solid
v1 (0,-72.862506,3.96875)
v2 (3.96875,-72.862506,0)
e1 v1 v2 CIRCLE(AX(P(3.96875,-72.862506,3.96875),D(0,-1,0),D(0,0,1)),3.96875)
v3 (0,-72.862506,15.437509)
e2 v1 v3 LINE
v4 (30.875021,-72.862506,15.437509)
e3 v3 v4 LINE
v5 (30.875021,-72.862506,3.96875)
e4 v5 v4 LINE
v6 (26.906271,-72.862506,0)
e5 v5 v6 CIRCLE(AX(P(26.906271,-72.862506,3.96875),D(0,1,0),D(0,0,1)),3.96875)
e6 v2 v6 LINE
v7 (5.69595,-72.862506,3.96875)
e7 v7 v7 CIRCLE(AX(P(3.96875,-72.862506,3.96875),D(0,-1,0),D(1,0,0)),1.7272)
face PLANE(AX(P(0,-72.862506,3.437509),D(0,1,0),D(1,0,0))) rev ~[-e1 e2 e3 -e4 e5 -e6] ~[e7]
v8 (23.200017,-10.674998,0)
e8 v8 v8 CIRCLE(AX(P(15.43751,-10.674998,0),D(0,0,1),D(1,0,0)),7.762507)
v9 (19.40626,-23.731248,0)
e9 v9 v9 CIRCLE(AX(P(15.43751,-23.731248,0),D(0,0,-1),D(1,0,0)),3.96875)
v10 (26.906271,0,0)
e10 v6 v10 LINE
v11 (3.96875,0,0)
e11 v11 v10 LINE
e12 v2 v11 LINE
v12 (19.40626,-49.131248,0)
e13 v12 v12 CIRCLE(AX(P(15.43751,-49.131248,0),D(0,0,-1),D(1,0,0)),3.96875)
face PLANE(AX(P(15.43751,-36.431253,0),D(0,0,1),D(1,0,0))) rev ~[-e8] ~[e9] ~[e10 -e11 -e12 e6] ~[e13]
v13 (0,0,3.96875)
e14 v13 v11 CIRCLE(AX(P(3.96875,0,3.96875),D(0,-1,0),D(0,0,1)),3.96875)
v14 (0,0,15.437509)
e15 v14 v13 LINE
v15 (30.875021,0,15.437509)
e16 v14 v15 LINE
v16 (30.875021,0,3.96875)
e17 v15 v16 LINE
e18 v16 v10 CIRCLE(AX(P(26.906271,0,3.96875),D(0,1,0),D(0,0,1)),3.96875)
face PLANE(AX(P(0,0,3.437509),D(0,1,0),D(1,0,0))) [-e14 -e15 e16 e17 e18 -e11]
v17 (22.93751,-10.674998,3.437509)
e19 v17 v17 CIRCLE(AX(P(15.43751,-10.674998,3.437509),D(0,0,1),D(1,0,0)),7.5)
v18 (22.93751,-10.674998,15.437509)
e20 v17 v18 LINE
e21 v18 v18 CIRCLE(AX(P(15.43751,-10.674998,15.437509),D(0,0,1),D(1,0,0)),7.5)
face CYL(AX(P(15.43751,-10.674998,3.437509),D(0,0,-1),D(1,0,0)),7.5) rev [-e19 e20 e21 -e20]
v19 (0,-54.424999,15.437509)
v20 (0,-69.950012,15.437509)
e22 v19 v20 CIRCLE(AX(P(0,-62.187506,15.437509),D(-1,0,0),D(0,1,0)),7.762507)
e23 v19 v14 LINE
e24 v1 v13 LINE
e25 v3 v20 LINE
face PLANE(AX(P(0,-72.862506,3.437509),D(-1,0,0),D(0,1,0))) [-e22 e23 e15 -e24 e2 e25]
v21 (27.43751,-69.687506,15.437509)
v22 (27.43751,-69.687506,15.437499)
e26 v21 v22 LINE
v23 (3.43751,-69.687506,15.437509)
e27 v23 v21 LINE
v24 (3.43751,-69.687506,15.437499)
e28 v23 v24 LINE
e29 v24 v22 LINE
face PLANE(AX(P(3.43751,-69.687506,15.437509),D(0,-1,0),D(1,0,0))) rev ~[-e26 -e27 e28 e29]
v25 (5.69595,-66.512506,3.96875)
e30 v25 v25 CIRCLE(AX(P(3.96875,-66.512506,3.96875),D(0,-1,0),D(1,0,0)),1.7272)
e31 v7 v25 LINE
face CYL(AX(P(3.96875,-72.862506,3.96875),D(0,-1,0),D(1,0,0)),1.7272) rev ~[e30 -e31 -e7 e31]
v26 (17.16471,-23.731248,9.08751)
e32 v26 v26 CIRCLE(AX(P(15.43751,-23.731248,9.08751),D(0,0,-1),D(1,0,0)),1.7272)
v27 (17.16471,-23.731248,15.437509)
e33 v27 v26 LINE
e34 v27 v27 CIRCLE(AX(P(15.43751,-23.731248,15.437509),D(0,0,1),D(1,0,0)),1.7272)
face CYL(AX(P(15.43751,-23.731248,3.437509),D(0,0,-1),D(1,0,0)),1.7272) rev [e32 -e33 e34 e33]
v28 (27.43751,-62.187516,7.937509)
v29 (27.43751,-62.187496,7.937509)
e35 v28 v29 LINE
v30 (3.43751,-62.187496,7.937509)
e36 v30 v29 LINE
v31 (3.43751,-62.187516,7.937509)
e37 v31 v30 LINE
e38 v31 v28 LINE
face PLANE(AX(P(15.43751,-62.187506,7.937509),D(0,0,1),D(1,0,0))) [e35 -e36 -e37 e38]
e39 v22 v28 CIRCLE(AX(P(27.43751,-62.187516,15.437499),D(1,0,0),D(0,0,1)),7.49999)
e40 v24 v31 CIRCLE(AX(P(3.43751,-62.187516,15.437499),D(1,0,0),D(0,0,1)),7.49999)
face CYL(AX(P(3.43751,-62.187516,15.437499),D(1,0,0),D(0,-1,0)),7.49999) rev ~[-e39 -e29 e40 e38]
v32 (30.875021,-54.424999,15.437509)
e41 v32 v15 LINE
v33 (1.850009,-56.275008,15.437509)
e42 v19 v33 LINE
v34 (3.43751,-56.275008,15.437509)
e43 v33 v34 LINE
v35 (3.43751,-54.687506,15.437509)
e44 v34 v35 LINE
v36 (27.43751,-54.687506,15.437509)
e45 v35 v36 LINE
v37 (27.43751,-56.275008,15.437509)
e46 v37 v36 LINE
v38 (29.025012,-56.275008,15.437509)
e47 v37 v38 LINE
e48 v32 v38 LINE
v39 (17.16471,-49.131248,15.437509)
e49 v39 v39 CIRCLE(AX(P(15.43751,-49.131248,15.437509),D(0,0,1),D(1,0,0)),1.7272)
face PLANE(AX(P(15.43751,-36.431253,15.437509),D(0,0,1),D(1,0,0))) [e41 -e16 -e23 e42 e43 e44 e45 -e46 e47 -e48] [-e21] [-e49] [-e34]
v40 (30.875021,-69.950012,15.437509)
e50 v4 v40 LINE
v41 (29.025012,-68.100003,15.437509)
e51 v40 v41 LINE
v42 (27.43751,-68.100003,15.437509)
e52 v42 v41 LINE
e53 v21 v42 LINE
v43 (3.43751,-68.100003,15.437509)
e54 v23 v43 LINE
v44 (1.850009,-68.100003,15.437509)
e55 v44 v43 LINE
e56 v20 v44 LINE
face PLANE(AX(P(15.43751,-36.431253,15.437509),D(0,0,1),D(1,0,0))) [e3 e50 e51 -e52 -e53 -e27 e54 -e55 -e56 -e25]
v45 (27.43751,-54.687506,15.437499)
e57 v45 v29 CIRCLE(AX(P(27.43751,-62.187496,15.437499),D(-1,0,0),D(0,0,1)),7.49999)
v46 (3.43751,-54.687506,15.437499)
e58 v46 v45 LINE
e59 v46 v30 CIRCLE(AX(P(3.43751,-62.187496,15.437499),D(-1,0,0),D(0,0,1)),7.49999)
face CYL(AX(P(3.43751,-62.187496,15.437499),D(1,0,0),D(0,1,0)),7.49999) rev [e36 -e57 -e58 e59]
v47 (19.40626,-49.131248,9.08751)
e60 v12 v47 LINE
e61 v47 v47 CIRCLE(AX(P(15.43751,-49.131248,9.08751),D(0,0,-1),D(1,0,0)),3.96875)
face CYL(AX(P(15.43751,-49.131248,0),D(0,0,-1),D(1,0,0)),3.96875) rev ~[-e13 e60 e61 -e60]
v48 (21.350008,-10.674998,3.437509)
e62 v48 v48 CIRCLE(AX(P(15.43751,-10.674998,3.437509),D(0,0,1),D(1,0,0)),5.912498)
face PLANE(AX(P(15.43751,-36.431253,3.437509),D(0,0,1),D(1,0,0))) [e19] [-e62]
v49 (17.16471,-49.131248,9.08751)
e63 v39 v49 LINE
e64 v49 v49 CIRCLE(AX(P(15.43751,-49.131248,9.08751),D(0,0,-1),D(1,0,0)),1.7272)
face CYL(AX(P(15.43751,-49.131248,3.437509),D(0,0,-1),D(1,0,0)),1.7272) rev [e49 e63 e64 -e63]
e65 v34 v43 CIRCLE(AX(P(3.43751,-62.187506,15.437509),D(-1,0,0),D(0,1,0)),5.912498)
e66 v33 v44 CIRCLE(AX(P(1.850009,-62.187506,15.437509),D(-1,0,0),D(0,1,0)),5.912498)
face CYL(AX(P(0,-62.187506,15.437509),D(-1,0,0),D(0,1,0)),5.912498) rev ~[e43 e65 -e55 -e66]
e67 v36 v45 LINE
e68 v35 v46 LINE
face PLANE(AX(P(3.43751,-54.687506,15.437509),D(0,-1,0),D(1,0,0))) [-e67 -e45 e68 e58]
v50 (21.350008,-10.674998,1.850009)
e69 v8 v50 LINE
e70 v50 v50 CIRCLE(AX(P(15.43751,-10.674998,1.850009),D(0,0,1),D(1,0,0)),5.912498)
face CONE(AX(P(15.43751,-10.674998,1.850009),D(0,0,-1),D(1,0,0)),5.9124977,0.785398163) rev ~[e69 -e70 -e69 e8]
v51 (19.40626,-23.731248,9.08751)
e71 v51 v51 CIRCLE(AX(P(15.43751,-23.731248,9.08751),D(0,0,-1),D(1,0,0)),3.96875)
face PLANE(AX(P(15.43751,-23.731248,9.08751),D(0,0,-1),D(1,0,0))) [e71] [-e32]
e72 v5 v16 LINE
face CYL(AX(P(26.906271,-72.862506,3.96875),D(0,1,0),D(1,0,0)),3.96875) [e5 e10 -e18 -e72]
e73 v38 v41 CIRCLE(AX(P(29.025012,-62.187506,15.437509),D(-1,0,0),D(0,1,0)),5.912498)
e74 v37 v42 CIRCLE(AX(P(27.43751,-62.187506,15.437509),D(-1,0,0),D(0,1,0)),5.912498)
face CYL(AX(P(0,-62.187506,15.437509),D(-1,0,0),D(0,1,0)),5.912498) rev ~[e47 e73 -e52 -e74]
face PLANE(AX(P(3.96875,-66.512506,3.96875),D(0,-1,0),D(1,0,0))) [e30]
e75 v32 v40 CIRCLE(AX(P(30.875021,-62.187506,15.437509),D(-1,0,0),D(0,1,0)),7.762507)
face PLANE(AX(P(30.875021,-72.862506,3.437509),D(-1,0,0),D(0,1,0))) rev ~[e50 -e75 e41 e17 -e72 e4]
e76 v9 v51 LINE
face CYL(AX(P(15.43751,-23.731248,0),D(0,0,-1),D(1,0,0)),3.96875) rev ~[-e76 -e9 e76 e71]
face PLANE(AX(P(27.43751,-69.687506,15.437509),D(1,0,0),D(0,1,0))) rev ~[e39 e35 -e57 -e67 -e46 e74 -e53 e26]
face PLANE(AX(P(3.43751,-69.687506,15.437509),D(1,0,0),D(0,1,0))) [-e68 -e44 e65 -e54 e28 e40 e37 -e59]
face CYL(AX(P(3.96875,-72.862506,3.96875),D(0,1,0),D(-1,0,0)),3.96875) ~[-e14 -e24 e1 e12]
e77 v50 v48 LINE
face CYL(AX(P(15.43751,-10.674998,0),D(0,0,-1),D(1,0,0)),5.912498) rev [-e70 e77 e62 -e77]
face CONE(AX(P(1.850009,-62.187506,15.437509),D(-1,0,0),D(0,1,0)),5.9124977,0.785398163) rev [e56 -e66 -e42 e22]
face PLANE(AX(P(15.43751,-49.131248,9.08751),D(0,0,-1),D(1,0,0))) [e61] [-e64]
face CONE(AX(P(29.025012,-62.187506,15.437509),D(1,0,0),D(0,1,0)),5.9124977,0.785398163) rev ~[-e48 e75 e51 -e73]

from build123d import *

# Parameters (mm, degrees)
F0_W      = 30.8750208
F0_H      = 72.8625058
F0_R      = 1.7272
F0_R_2    = 5.9124977
F1_DEPTH  = 3.437509
F2_W      = 30.8750208
F2_H      = 72.8625058
F2_R      = 1.7272
F2_R_2    = 7.5
F3_DEPTH  = 12
F4_W      = 24
F4_H      = 15
F5_DEPTH  = 7.5
F6_R      = 7.49999
F8_DEPTH  = 30.8750208
F9_R      = 3.96875
F10_DEPTH = 9.0875104
F11_R     = 3.96875
F12_R     = 1.7272
F13_DEPTH = 6.35
F14_SIZE  = 1.850009


# Not quite as in the source:
# - a fillet or chamfer is up to 0.001 mm smaller than in the source, because OpenCascade refuses the exact size


with BuildPart() as f1:
    # F0 (on Top) → F1 (new body)
    with BuildSketch(Plane.XY):
        with Locations((15.4375104, -36.4312529)):
            Rectangle(F0_W, F0_H)
        with Locations((15.4375104, -49.1312477)):
            Circle(F0_R, mode=Mode.SUBTRACT)
        with Locations((15.4375104, -23.7312477)):
            Circle(F0_R, mode=Mode.SUBTRACT)
        with Locations((15.4375104, -10.6749977)):
            Circle(F0_R_2, mode=Mode.SUBTRACT)
    extrude(amount=F1_DEPTH)

    # F2 (on face) → F3 (join)
    with BuildSketch(Plane.XY.offset(3.437509)):
        with Locations((15.4375104, -36.4312529)):
            Rectangle(F2_W, F2_H)
        with Locations((15.4375104, -49.1312477)):
            Circle(F2_R, mode=Mode.SUBTRACT)
        with Locations((15.4375104, -23.7312477)):
            Circle(F2_R, mode=Mode.SUBTRACT)
        with Locations((15.4375104, -10.6749977)):
            Circle(F2_R_2, mode=Mode.SUBTRACT)
    extrude(amount=F3_DEPTH)

    # F4 (on face) → F5 (cut)
    with BuildSketch(Plane.XY.offset(15.437509)):
        with Locations((15.4375104, -62.1875058)):
            Rectangle(F4_W, F4_H)
    extrude(amount=-F5_DEPTH, mode=Mode.SUBTRACT)

    # F6 (radius 7.5 in the source; OpenCascade refuses exactly that, so slightly less here)
    f6_edges = [f1.edges().sort_by_distance(p)[0] for p in [
        (15.43751, -54.687506, 7.937509),
        (15.43751, -69.687506, 7.937509),
    ]]
    fillet(f6_edges, radius=F6_R)

    # F7 (on face) → F8 (cut, through all)
    with BuildSketch(Plane(origin=(0, 0, 0), x_dir=(0, -1, 0), z_dir=(-1, 0, 0))):
        with BuildLine():
            Line((68.1000035, 15.437509), (56.2750081, 15.437509))
            ThreePointArc((56.2750081, 15.437509), (62.1875058, 9.5250113), (68.1000035, 15.437509))
        make_face()
    extrude(amount=-F8_DEPTH, mode=Mode.SUBTRACT)

    # F9 (on face) → F10 (cut)
    with BuildSketch(Plane(origin=(0, 0, 0), x_dir=(1, 0, 0), z_dir=(0, 0, -1))):
        with Locations((15.4375104, 23.7312477)):
            Circle(F9_R)
        with Locations((15.4375104, 49.1312477)):
            Circle(F9_R)
    extrude(amount=-F10_DEPTH, mode=Mode.SUBTRACT)

    # F11
    f11_edges = [f1.edges().sort_by_distance(p)[0] for p in [
        (0, -36.431253, 0),
        (30.875021, -36.431253, 0),
    ]]
    fillet(f11_edges, radius=F11_R)

    # F12 (on face) → F13 (cut)
    with BuildSketch(Plane.XZ.offset(72.8625058)):
        with Locations((3.96875, 3.96875)):
            Circle(F12_R)
    extrude(amount=-F13_DEPTH, mode=Mode.SUBTRACT)

    # F14
    f14_edges = [f1.edges().sort_by_distance(p)[0] for p in [
        (9.525013, -10.674998, 0),
        (30.875021, -62.187506, 9.525011),
        (0, -62.187506, 9.525011),
    ]]
    chamfer(f14_edges, length=F14_SIZE)


solid = f1.part
